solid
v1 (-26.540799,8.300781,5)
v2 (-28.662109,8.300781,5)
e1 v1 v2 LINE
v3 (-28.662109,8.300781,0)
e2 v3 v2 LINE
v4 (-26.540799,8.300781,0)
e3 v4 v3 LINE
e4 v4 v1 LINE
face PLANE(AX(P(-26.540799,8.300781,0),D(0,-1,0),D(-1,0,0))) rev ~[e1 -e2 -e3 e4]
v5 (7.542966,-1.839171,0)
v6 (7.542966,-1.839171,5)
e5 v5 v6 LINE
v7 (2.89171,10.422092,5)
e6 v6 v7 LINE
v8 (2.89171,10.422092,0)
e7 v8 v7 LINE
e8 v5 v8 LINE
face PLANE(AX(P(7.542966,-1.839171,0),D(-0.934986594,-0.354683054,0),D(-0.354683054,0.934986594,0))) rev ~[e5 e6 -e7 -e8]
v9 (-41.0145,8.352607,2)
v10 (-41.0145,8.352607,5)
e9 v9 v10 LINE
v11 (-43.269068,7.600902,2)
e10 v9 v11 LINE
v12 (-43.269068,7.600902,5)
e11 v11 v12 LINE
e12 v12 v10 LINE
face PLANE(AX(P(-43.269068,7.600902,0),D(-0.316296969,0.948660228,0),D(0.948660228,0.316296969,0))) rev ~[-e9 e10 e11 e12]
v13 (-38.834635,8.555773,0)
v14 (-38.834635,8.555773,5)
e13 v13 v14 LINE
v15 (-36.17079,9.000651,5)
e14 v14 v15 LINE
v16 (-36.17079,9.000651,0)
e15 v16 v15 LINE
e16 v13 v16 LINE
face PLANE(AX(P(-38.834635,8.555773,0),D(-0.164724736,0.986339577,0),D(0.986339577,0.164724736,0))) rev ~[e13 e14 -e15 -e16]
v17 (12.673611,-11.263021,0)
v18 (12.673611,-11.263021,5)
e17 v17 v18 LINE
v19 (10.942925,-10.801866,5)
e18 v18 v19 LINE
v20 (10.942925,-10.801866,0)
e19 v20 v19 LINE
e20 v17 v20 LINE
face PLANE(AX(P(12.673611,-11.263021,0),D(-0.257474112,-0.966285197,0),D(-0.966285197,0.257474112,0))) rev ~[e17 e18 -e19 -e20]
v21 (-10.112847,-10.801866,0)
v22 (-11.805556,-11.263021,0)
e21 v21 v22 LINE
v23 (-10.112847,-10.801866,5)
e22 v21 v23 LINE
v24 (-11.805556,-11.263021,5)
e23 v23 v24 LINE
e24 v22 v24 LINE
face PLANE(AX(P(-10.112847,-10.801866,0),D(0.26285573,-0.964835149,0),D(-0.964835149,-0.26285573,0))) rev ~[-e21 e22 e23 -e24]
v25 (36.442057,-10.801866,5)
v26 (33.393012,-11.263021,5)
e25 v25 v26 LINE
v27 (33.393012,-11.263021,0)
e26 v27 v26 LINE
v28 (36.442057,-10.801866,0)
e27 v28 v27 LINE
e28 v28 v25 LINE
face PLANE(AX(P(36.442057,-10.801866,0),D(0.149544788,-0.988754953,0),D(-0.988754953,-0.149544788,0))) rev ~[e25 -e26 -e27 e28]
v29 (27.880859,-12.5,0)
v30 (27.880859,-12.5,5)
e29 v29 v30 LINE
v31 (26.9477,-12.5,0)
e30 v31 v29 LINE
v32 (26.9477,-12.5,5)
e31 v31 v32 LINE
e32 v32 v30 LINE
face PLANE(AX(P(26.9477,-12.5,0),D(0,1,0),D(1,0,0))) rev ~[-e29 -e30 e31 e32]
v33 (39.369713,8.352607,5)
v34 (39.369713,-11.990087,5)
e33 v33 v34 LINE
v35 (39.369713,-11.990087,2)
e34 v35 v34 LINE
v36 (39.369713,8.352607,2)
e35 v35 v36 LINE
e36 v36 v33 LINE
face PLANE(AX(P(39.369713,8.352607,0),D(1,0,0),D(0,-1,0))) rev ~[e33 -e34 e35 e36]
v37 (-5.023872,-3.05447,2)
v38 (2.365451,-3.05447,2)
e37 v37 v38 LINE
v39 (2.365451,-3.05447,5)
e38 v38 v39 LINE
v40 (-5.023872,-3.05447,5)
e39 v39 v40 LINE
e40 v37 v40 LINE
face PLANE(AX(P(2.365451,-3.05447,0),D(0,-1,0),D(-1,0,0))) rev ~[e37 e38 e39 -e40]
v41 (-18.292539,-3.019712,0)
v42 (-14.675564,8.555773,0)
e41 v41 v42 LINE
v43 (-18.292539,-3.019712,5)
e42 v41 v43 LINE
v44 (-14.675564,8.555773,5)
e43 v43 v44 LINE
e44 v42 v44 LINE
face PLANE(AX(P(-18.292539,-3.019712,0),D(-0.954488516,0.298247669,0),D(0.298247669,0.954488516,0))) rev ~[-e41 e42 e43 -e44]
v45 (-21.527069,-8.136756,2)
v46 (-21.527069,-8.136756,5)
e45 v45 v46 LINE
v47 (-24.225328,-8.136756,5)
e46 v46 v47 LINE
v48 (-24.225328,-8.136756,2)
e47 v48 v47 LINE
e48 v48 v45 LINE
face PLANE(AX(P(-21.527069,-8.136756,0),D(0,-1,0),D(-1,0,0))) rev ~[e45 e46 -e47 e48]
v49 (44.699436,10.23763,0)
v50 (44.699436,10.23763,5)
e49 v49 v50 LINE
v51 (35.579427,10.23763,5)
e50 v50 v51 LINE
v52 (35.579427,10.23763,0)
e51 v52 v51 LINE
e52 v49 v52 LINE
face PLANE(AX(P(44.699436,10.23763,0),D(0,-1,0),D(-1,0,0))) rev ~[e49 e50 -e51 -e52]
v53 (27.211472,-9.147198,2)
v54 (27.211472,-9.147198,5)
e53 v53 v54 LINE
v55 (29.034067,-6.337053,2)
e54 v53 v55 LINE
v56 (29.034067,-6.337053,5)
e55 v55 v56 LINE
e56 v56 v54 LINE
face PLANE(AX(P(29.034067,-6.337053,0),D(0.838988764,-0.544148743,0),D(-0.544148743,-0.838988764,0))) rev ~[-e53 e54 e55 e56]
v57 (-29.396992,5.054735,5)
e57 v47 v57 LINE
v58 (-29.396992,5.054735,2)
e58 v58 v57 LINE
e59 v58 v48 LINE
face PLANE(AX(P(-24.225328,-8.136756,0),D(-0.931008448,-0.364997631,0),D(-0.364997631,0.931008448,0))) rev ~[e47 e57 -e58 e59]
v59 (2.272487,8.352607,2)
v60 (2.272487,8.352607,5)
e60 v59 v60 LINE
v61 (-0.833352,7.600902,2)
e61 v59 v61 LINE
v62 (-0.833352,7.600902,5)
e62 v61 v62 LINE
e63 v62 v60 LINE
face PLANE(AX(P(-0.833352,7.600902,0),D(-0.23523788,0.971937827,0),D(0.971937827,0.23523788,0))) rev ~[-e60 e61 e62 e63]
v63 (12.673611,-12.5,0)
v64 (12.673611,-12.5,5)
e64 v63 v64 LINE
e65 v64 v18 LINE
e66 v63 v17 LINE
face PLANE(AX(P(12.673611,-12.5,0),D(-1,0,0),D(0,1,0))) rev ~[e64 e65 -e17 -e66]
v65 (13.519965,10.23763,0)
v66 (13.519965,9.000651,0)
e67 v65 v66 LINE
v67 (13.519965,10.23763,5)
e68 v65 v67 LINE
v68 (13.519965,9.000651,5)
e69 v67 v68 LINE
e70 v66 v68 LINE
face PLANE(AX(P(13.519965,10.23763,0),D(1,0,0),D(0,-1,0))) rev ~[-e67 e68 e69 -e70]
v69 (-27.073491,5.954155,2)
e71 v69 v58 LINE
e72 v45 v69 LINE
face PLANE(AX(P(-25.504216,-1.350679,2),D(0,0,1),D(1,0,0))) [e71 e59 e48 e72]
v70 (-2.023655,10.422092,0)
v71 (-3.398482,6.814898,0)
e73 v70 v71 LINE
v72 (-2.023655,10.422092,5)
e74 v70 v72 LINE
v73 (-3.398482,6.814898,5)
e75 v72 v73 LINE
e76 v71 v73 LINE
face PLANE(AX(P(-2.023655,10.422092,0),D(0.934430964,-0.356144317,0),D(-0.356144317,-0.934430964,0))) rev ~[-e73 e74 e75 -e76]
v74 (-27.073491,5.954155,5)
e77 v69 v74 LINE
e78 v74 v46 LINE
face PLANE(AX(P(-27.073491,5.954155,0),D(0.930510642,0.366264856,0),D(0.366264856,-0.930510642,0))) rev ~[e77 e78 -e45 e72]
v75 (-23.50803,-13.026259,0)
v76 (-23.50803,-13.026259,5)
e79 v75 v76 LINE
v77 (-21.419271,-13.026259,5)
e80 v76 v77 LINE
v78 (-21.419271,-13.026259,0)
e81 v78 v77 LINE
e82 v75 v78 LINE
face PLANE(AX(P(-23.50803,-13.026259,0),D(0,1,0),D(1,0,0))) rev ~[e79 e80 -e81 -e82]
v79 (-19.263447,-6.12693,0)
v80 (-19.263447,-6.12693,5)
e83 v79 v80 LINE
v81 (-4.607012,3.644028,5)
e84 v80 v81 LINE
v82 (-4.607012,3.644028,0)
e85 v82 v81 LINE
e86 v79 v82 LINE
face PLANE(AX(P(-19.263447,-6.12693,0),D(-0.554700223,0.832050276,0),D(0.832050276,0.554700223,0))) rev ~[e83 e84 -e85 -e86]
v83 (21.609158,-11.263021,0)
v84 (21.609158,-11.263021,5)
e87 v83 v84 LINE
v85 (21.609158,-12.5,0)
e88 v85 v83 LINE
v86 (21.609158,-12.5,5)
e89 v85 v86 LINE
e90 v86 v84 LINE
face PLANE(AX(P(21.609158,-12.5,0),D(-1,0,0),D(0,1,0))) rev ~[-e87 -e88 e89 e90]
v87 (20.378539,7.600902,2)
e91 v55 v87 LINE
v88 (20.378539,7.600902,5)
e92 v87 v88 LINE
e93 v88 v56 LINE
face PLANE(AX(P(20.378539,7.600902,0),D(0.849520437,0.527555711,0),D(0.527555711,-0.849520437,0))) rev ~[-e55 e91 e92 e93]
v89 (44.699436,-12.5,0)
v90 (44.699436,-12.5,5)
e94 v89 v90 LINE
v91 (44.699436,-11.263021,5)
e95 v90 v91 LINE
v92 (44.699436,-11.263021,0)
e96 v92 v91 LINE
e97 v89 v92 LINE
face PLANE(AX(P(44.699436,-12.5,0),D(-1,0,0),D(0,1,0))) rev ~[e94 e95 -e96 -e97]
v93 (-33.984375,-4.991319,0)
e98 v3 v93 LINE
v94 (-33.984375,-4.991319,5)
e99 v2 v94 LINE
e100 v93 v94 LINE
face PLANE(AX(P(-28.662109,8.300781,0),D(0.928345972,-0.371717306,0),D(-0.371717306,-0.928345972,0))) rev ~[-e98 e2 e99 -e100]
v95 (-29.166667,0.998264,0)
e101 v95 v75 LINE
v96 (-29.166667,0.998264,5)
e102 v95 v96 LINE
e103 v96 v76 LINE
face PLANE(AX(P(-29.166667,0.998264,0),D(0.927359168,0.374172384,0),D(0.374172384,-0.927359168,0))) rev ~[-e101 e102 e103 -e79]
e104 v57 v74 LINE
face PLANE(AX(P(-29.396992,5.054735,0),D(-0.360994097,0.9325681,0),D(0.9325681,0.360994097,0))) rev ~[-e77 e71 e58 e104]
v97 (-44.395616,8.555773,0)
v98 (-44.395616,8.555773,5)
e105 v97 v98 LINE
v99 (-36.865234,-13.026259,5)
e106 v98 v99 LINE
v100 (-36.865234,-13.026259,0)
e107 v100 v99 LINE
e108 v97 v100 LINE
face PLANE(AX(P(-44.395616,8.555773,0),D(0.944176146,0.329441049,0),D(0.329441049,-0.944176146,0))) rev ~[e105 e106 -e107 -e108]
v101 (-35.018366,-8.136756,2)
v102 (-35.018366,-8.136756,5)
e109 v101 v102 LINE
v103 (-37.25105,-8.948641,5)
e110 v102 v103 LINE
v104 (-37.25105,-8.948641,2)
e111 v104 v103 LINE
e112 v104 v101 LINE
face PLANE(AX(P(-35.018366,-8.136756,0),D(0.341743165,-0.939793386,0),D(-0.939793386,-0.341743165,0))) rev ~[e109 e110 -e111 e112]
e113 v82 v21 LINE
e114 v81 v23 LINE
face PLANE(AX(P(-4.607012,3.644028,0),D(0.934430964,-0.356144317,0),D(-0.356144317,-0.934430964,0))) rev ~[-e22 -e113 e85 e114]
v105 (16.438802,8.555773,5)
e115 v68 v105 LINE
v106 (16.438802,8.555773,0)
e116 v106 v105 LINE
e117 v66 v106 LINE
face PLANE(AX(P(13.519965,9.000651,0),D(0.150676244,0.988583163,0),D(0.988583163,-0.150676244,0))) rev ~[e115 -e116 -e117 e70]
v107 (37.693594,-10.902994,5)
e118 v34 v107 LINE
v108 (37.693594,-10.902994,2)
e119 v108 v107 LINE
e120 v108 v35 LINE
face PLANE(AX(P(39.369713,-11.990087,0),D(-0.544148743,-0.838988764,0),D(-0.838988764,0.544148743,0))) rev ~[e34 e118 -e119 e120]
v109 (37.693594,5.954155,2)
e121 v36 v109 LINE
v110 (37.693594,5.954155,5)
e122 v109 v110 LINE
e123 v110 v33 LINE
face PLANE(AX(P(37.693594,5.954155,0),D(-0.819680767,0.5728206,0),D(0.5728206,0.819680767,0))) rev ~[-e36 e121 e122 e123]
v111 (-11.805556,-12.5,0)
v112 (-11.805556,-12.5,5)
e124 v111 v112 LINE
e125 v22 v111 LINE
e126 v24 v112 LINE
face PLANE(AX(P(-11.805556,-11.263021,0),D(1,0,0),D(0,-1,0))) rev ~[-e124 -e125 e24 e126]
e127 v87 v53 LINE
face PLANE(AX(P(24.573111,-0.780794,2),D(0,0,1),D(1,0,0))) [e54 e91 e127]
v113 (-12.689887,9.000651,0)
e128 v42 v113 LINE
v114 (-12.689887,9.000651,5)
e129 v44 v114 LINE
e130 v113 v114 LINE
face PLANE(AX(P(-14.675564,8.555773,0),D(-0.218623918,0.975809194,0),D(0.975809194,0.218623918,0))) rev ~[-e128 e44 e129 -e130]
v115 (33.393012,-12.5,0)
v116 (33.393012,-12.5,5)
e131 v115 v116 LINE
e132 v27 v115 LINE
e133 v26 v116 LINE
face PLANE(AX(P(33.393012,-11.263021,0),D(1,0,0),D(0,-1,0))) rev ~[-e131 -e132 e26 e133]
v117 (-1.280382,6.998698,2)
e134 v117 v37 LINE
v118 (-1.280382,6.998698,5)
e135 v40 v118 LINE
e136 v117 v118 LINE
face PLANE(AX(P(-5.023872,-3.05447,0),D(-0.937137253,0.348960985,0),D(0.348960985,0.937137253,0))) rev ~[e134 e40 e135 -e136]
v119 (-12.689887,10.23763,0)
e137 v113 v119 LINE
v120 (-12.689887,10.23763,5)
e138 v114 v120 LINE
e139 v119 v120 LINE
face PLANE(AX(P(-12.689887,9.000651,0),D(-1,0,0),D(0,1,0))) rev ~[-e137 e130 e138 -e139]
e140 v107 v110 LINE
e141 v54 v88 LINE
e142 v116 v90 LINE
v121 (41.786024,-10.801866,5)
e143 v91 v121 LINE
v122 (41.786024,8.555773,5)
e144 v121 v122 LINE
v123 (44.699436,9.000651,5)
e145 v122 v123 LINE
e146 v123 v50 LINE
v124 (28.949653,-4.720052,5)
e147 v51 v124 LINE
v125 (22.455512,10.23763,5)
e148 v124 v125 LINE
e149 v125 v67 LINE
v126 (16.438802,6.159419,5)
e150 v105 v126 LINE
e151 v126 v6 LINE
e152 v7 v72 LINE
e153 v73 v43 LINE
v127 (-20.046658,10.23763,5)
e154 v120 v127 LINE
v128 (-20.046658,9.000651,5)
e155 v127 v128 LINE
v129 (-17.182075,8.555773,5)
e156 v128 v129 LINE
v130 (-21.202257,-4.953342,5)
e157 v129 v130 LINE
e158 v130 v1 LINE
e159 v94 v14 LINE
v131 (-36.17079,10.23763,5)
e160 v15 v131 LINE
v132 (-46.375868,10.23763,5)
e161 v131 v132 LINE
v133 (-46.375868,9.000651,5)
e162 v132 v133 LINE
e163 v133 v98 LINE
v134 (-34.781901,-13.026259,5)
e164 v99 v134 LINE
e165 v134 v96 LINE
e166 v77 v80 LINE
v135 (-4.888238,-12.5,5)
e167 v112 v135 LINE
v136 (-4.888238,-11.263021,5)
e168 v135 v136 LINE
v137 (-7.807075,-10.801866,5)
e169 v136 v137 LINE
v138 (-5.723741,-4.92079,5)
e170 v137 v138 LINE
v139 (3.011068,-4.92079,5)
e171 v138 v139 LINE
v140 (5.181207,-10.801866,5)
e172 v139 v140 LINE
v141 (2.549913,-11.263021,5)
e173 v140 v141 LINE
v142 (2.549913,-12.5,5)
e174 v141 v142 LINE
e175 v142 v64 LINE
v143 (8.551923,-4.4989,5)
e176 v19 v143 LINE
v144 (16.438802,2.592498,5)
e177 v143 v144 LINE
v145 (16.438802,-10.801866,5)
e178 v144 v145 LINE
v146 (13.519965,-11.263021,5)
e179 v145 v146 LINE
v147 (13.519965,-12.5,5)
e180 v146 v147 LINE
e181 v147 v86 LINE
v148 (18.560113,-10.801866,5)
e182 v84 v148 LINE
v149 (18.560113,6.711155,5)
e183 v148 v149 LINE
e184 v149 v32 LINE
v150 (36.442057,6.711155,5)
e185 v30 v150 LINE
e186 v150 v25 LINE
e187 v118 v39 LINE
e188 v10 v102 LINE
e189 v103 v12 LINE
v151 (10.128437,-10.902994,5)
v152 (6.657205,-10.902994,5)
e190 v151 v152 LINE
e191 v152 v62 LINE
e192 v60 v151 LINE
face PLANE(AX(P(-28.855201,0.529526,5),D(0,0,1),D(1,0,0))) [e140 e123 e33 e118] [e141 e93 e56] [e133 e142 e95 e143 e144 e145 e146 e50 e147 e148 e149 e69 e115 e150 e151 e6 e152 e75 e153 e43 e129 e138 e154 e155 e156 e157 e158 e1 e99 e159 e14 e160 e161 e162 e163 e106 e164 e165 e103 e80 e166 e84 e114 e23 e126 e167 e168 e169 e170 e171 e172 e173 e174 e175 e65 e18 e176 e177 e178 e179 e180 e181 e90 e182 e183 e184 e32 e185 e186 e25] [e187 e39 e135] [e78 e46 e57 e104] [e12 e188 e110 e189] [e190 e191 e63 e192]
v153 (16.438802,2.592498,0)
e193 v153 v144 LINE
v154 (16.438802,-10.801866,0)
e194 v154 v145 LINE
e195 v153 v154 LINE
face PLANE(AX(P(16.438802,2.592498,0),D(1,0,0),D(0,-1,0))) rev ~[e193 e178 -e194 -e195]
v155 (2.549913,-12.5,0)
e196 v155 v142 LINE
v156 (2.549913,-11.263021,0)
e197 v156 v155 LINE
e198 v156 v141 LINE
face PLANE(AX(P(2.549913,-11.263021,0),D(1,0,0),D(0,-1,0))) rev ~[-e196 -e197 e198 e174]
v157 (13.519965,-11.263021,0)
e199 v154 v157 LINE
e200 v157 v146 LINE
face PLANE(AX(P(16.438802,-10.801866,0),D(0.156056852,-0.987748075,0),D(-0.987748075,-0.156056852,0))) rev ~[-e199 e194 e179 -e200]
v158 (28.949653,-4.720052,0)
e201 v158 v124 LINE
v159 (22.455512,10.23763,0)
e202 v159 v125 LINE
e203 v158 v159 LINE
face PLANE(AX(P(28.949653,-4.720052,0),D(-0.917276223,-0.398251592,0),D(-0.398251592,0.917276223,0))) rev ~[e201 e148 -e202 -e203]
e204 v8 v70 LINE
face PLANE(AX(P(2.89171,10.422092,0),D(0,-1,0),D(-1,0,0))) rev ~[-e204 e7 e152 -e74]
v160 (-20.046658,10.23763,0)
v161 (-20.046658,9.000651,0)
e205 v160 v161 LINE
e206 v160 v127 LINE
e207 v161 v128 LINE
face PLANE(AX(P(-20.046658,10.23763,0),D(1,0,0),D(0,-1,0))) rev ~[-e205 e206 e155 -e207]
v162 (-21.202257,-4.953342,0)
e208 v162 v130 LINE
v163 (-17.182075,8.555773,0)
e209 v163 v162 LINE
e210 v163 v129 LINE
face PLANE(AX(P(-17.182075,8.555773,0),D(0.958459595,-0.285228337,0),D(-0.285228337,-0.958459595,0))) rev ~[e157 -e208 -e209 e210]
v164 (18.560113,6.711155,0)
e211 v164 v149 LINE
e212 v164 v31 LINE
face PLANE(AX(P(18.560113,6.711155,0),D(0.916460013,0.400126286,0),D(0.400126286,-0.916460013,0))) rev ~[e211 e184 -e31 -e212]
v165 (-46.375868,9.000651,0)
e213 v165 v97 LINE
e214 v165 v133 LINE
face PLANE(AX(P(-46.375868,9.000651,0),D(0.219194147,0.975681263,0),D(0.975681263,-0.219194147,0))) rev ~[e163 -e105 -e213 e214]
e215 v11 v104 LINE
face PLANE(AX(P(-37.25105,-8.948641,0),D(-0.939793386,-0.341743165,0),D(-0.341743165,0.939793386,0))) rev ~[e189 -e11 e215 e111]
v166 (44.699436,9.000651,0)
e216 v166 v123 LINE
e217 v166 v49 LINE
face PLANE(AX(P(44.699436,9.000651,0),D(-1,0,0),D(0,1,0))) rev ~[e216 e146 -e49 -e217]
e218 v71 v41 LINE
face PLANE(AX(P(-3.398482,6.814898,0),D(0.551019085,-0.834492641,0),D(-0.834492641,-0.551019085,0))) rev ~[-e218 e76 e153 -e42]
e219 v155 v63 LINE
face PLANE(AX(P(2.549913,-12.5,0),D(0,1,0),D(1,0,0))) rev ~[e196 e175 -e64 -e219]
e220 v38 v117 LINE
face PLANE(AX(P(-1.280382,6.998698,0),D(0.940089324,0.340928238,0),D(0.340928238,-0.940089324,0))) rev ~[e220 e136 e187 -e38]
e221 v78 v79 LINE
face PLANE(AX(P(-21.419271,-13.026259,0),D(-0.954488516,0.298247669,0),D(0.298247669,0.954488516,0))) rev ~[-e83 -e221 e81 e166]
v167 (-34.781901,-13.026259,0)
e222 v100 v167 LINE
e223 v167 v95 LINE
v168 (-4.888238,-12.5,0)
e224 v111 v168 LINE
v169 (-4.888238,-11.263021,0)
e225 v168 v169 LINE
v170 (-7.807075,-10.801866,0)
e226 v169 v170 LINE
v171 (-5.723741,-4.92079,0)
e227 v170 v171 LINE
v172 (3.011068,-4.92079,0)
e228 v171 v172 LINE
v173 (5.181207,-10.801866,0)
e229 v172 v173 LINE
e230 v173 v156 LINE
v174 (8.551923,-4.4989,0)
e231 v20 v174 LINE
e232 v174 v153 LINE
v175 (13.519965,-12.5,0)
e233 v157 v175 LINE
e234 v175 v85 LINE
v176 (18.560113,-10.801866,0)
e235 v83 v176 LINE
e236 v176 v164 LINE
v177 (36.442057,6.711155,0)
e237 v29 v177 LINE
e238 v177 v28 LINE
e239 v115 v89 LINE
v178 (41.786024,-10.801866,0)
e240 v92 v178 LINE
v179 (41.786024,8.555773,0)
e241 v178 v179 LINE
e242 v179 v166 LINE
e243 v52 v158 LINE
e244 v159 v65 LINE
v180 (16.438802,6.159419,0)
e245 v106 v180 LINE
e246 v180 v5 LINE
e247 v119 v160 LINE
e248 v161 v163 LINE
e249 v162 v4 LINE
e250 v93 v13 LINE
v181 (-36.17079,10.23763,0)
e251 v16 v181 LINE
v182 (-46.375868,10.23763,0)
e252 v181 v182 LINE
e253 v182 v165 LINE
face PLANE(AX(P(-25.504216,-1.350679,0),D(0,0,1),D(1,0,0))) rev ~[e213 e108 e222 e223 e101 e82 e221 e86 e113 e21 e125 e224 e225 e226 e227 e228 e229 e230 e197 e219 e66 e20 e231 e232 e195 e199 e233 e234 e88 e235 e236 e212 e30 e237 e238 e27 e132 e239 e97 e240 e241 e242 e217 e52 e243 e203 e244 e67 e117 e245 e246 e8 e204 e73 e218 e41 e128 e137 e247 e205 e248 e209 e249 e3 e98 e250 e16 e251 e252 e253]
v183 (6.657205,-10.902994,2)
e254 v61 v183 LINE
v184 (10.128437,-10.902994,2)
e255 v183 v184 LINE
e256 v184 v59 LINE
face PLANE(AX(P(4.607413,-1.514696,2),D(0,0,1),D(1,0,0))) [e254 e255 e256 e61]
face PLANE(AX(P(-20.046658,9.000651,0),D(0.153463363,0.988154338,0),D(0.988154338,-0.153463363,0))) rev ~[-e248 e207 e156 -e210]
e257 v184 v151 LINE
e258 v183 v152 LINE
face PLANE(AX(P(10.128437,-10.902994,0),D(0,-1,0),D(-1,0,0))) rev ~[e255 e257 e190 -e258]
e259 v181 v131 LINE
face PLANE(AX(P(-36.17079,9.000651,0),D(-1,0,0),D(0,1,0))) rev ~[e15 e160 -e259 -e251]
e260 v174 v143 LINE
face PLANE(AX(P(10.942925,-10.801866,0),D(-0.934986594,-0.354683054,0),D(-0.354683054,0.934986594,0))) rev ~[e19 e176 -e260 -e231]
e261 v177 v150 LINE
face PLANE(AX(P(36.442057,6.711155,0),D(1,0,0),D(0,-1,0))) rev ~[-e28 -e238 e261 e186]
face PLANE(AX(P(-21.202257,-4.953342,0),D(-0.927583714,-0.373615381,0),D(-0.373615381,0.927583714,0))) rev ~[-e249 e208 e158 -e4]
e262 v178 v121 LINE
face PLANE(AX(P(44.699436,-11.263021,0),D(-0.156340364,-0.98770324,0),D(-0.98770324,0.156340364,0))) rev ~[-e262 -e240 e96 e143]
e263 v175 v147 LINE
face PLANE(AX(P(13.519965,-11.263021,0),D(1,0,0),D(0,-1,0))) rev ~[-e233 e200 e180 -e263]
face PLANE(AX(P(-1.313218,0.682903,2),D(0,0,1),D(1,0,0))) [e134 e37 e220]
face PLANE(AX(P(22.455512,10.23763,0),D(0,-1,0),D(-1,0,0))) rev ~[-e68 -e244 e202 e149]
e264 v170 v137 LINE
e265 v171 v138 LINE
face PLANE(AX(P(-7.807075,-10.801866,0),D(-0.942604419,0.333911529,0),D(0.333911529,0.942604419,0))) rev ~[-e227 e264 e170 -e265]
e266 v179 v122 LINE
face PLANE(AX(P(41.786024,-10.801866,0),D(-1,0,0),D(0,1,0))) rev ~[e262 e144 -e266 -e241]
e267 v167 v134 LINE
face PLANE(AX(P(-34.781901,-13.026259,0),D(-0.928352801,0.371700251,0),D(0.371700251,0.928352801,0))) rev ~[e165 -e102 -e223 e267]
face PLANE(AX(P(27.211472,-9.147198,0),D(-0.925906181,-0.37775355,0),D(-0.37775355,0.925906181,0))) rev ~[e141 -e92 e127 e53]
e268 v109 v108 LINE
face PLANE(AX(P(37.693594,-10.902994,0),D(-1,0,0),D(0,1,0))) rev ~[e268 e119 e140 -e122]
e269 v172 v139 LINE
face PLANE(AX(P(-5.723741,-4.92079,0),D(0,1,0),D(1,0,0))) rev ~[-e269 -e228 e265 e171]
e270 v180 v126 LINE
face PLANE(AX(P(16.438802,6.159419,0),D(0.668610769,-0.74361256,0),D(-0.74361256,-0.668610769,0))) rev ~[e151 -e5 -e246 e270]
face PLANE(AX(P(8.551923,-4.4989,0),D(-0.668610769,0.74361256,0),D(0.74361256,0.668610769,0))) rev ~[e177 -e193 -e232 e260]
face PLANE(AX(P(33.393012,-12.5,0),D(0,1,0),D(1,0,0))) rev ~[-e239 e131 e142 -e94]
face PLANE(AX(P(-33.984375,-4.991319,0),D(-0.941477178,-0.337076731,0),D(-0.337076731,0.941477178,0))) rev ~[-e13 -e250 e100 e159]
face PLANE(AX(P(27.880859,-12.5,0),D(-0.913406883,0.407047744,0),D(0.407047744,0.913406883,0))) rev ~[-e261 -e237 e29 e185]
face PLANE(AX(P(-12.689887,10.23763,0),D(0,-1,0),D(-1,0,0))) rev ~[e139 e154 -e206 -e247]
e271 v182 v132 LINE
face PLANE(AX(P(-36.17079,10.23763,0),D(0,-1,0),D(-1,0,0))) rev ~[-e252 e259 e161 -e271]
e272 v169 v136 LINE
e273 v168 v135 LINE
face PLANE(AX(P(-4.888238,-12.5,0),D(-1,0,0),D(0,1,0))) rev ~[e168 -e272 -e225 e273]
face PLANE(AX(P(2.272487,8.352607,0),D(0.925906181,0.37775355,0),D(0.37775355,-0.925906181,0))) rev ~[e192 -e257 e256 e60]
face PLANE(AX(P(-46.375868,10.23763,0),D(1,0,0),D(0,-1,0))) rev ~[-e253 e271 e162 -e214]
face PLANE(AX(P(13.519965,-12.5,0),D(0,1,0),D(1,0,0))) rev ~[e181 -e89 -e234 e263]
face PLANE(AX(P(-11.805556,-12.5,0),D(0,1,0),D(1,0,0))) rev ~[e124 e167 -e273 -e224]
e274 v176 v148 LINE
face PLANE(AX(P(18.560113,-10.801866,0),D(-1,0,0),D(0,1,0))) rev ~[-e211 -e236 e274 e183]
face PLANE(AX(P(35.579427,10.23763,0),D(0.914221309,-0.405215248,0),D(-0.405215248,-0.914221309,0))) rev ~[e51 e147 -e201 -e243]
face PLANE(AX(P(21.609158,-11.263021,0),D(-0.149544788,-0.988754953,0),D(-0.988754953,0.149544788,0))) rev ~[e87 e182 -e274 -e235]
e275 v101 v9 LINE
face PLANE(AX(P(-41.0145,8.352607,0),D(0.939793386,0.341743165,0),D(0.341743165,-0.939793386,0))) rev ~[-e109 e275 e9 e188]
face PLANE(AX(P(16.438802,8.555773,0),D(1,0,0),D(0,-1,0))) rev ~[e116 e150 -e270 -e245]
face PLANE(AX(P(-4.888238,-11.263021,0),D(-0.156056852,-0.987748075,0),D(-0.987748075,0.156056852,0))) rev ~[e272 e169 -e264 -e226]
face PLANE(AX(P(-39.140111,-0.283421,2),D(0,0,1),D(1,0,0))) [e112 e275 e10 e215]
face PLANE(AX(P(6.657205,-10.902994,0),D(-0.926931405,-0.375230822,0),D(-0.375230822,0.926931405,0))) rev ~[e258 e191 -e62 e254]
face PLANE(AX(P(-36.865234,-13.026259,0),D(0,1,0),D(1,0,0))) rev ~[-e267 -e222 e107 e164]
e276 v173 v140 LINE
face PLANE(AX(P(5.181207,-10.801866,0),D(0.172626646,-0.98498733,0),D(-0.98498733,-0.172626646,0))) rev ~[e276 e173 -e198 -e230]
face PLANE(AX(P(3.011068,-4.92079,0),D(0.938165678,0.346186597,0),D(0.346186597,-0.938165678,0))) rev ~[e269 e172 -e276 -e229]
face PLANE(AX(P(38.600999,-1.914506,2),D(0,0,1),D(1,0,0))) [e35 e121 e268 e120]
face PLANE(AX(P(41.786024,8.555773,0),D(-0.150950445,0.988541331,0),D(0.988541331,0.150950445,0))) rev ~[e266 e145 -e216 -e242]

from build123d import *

# Parameters (mm, degrees)
F1_DEPTH = 5
F2_DEPTH = 2


with BuildPart() as f1:
    # F0 (on Top) → F1 (new body)
    with BuildSketch(Plane.XY):
        Polygon((-19.2634474565, -6.1269301263), (-18.2925394874, -3.0197121847), (-14.6755642361, 8.5557725694), (-12.6898871528, 9.0006510417), (-12.6898871528, 10.2376302083), (-20.0466579861, 10.2376302083), (-20.0466579861, 9.0006510417), (-17.1820746528, 8.5557725694), (-21.2022569444, -4.9533420139), (-26.5407986111, 8.30078125), (-28.662109375, 8.30078125), (-33.984375, -4.9913194444), (-38.8346354167, 8.5557725694), (-36.1707899306, 9.0006510417), (-36.1707899306, 10.2376302083), (-46.3758680556, 10.2376302083), (-46.3758680556, 9.0006510417), (-44.3956163194, 8.5557725694), (-36.865234375, -13.0262586806), (-34.7819010417, -13.0262586806), (-29.1666666667, 0.9982638889), (-23.5080295139, -13.0262586806), (-21.4192708333, -13.0262586806), align=None)
        Polygon((-43.2690681627, 7.6009020128), (-41.0144999623, 8.3526074886), (-35.0183658302, -8.1367557868), (-37.251050357, -8.9486413444), align=None, mode=Mode.SUBTRACT)
        Polygon((-29.3969921768, 5.0547351129), (-27.0734913647, 5.9541547671), (-21.5270686895, -8.1367557868), (-24.2253281176, -8.1367557868), align=None, mode=Mode.SUBTRACT)
        Polygon((-4.6070118818, 3.644027612), (-3.3984823364, 6.814897888), (-18.2925394874, -3.0197121847), (-19.2634474565, -6.1269301263), align=None)
        Polygon((-2.0236545139, 10.4220920139), (-3.3984823364, 6.814897888), (-4.6070118818, 3.644027612), (-10.1128472222, -10.8018663194), (-11.8055555556, -11.2630208333), (-11.8055555556, -12.5), (-4.8882378472, -12.5), (-4.8882378472, -11.2630208333), (-7.8070746528, -10.8018663194), (-5.7237413194, -4.9207899306), (3.0110677083, -4.9207899306), (5.1812065972, -10.8018663194), (2.5499131944, -11.2630208333), (2.5499131944, -12.5), (12.6736111111, -12.5), (12.6736111111, -11.2630208333), (10.9429253472, -10.8018663194), (8.5519227834, -4.4988999923), (7.5429662144, -1.8391708158), (2.8917100694, 10.4220920139), align=None)
        Polygon((-5.0238715278, -3.0544704861), (-1.2803819444, 6.9986979167), (2.3654513889, -3.0544704861), align=None, mode=Mode.SUBTRACT)
        Polygon((-0.8333516307, 7.6009020128), (2.2724873852, 8.3526074886), (10.1284366101, -10.9029943123), (6.6572050564, -10.9029943123), align=None, mode=Mode.SUBTRACT)
        Polygon((16.4388020833, 6.1594187407), (7.5429662144, -1.8391708158), (8.5519227834, -4.4988999923), (16.4388020833, 2.5924977505), align=None)
        Polygon((16.4388020833, 8.5557725694), (16.4388020833, 6.1594187407), (16.4388020833, 2.5924977505), (16.4388020833, -10.8018663194), (13.5199652778, -11.2630208333), (13.5199652778, -12.5), (21.6091579861, -12.5), (21.6091579861, -11.2630208333), (18.5601128472, -10.8018663194), (18.5601128472, 6.7111545139), (26.9476996528, -12.5), (27.880859375, -12.5), (36.4420572917, 6.7111545139), (36.4420572917, -10.8018663194), (33.3930121528, -11.2630208333), (33.3930121528, -12.5), (44.6994357639, -12.5), (44.6994357639, -11.2630208333), (41.7860243056, -10.8018663194), (41.7860243056, 8.5557725694), (44.6994357639, 9.0006510417), (44.6994357639, 10.2376302083), (35.5794270833, 10.2376302083), (28.9496527778, -4.7200520833), (22.4555121528, 10.2376302083), (13.5199652778, 10.2376302083), (13.5199652778, 9.0006510417), align=None)
        Polygon((37.6935936511, -10.9029943123), (37.6935936511, 5.9541547671), (39.3697134069, 8.3526074886), (39.3697134069, -11.9900868907), align=None, mode=Mode.SUBTRACT)
        Polygon((27.211471604, -9.1471979388), (20.3785393387, 7.6009020128), (29.0340669453, -6.3370526768), align=None, mode=Mode.SUBTRACT)
    extrude(amount=F1_DEPTH)

    # F0 (on Top) → F2 (join)
    with BuildSketch(Plane.XY):
        Polygon((-21.5270686895, -8.1367557868), (-27.0734913647, 5.9541547671), (-29.3969921768, 5.0547351129), (-24.2253281176, -8.1367557868), align=None)
        Polygon((-35.0183658302, -8.1367557868), (-41.0144999623, 8.3526074886), (-43.2690681627, 7.6009020128), (-37.251050357, -8.9486413444), align=None)
        Polygon((10.1284366101, -10.9029943123), (2.2724873852, 8.3526074886), (-0.8333516307, 7.6009020128), (6.6572050564, -10.9029943123), align=None)
        Polygon((2.3654513889, -3.0544704861), (-1.2803819444, 6.9986979167), (-5.0238715278, -3.0544704861), align=None)
        Polygon((29.0340669453, -6.3370526768), (20.3785393387, 7.6009020128), (27.211471604, -9.1471979388), align=None)
        Polygon((39.3697134069, 8.3526074886), (37.6935936511, 5.9541547671), (37.6935936511, -10.9029943123), (39.3697134069, -11.9900868907), align=None)
    extrude(amount=F2_DEPTH)


solid = f1.part
